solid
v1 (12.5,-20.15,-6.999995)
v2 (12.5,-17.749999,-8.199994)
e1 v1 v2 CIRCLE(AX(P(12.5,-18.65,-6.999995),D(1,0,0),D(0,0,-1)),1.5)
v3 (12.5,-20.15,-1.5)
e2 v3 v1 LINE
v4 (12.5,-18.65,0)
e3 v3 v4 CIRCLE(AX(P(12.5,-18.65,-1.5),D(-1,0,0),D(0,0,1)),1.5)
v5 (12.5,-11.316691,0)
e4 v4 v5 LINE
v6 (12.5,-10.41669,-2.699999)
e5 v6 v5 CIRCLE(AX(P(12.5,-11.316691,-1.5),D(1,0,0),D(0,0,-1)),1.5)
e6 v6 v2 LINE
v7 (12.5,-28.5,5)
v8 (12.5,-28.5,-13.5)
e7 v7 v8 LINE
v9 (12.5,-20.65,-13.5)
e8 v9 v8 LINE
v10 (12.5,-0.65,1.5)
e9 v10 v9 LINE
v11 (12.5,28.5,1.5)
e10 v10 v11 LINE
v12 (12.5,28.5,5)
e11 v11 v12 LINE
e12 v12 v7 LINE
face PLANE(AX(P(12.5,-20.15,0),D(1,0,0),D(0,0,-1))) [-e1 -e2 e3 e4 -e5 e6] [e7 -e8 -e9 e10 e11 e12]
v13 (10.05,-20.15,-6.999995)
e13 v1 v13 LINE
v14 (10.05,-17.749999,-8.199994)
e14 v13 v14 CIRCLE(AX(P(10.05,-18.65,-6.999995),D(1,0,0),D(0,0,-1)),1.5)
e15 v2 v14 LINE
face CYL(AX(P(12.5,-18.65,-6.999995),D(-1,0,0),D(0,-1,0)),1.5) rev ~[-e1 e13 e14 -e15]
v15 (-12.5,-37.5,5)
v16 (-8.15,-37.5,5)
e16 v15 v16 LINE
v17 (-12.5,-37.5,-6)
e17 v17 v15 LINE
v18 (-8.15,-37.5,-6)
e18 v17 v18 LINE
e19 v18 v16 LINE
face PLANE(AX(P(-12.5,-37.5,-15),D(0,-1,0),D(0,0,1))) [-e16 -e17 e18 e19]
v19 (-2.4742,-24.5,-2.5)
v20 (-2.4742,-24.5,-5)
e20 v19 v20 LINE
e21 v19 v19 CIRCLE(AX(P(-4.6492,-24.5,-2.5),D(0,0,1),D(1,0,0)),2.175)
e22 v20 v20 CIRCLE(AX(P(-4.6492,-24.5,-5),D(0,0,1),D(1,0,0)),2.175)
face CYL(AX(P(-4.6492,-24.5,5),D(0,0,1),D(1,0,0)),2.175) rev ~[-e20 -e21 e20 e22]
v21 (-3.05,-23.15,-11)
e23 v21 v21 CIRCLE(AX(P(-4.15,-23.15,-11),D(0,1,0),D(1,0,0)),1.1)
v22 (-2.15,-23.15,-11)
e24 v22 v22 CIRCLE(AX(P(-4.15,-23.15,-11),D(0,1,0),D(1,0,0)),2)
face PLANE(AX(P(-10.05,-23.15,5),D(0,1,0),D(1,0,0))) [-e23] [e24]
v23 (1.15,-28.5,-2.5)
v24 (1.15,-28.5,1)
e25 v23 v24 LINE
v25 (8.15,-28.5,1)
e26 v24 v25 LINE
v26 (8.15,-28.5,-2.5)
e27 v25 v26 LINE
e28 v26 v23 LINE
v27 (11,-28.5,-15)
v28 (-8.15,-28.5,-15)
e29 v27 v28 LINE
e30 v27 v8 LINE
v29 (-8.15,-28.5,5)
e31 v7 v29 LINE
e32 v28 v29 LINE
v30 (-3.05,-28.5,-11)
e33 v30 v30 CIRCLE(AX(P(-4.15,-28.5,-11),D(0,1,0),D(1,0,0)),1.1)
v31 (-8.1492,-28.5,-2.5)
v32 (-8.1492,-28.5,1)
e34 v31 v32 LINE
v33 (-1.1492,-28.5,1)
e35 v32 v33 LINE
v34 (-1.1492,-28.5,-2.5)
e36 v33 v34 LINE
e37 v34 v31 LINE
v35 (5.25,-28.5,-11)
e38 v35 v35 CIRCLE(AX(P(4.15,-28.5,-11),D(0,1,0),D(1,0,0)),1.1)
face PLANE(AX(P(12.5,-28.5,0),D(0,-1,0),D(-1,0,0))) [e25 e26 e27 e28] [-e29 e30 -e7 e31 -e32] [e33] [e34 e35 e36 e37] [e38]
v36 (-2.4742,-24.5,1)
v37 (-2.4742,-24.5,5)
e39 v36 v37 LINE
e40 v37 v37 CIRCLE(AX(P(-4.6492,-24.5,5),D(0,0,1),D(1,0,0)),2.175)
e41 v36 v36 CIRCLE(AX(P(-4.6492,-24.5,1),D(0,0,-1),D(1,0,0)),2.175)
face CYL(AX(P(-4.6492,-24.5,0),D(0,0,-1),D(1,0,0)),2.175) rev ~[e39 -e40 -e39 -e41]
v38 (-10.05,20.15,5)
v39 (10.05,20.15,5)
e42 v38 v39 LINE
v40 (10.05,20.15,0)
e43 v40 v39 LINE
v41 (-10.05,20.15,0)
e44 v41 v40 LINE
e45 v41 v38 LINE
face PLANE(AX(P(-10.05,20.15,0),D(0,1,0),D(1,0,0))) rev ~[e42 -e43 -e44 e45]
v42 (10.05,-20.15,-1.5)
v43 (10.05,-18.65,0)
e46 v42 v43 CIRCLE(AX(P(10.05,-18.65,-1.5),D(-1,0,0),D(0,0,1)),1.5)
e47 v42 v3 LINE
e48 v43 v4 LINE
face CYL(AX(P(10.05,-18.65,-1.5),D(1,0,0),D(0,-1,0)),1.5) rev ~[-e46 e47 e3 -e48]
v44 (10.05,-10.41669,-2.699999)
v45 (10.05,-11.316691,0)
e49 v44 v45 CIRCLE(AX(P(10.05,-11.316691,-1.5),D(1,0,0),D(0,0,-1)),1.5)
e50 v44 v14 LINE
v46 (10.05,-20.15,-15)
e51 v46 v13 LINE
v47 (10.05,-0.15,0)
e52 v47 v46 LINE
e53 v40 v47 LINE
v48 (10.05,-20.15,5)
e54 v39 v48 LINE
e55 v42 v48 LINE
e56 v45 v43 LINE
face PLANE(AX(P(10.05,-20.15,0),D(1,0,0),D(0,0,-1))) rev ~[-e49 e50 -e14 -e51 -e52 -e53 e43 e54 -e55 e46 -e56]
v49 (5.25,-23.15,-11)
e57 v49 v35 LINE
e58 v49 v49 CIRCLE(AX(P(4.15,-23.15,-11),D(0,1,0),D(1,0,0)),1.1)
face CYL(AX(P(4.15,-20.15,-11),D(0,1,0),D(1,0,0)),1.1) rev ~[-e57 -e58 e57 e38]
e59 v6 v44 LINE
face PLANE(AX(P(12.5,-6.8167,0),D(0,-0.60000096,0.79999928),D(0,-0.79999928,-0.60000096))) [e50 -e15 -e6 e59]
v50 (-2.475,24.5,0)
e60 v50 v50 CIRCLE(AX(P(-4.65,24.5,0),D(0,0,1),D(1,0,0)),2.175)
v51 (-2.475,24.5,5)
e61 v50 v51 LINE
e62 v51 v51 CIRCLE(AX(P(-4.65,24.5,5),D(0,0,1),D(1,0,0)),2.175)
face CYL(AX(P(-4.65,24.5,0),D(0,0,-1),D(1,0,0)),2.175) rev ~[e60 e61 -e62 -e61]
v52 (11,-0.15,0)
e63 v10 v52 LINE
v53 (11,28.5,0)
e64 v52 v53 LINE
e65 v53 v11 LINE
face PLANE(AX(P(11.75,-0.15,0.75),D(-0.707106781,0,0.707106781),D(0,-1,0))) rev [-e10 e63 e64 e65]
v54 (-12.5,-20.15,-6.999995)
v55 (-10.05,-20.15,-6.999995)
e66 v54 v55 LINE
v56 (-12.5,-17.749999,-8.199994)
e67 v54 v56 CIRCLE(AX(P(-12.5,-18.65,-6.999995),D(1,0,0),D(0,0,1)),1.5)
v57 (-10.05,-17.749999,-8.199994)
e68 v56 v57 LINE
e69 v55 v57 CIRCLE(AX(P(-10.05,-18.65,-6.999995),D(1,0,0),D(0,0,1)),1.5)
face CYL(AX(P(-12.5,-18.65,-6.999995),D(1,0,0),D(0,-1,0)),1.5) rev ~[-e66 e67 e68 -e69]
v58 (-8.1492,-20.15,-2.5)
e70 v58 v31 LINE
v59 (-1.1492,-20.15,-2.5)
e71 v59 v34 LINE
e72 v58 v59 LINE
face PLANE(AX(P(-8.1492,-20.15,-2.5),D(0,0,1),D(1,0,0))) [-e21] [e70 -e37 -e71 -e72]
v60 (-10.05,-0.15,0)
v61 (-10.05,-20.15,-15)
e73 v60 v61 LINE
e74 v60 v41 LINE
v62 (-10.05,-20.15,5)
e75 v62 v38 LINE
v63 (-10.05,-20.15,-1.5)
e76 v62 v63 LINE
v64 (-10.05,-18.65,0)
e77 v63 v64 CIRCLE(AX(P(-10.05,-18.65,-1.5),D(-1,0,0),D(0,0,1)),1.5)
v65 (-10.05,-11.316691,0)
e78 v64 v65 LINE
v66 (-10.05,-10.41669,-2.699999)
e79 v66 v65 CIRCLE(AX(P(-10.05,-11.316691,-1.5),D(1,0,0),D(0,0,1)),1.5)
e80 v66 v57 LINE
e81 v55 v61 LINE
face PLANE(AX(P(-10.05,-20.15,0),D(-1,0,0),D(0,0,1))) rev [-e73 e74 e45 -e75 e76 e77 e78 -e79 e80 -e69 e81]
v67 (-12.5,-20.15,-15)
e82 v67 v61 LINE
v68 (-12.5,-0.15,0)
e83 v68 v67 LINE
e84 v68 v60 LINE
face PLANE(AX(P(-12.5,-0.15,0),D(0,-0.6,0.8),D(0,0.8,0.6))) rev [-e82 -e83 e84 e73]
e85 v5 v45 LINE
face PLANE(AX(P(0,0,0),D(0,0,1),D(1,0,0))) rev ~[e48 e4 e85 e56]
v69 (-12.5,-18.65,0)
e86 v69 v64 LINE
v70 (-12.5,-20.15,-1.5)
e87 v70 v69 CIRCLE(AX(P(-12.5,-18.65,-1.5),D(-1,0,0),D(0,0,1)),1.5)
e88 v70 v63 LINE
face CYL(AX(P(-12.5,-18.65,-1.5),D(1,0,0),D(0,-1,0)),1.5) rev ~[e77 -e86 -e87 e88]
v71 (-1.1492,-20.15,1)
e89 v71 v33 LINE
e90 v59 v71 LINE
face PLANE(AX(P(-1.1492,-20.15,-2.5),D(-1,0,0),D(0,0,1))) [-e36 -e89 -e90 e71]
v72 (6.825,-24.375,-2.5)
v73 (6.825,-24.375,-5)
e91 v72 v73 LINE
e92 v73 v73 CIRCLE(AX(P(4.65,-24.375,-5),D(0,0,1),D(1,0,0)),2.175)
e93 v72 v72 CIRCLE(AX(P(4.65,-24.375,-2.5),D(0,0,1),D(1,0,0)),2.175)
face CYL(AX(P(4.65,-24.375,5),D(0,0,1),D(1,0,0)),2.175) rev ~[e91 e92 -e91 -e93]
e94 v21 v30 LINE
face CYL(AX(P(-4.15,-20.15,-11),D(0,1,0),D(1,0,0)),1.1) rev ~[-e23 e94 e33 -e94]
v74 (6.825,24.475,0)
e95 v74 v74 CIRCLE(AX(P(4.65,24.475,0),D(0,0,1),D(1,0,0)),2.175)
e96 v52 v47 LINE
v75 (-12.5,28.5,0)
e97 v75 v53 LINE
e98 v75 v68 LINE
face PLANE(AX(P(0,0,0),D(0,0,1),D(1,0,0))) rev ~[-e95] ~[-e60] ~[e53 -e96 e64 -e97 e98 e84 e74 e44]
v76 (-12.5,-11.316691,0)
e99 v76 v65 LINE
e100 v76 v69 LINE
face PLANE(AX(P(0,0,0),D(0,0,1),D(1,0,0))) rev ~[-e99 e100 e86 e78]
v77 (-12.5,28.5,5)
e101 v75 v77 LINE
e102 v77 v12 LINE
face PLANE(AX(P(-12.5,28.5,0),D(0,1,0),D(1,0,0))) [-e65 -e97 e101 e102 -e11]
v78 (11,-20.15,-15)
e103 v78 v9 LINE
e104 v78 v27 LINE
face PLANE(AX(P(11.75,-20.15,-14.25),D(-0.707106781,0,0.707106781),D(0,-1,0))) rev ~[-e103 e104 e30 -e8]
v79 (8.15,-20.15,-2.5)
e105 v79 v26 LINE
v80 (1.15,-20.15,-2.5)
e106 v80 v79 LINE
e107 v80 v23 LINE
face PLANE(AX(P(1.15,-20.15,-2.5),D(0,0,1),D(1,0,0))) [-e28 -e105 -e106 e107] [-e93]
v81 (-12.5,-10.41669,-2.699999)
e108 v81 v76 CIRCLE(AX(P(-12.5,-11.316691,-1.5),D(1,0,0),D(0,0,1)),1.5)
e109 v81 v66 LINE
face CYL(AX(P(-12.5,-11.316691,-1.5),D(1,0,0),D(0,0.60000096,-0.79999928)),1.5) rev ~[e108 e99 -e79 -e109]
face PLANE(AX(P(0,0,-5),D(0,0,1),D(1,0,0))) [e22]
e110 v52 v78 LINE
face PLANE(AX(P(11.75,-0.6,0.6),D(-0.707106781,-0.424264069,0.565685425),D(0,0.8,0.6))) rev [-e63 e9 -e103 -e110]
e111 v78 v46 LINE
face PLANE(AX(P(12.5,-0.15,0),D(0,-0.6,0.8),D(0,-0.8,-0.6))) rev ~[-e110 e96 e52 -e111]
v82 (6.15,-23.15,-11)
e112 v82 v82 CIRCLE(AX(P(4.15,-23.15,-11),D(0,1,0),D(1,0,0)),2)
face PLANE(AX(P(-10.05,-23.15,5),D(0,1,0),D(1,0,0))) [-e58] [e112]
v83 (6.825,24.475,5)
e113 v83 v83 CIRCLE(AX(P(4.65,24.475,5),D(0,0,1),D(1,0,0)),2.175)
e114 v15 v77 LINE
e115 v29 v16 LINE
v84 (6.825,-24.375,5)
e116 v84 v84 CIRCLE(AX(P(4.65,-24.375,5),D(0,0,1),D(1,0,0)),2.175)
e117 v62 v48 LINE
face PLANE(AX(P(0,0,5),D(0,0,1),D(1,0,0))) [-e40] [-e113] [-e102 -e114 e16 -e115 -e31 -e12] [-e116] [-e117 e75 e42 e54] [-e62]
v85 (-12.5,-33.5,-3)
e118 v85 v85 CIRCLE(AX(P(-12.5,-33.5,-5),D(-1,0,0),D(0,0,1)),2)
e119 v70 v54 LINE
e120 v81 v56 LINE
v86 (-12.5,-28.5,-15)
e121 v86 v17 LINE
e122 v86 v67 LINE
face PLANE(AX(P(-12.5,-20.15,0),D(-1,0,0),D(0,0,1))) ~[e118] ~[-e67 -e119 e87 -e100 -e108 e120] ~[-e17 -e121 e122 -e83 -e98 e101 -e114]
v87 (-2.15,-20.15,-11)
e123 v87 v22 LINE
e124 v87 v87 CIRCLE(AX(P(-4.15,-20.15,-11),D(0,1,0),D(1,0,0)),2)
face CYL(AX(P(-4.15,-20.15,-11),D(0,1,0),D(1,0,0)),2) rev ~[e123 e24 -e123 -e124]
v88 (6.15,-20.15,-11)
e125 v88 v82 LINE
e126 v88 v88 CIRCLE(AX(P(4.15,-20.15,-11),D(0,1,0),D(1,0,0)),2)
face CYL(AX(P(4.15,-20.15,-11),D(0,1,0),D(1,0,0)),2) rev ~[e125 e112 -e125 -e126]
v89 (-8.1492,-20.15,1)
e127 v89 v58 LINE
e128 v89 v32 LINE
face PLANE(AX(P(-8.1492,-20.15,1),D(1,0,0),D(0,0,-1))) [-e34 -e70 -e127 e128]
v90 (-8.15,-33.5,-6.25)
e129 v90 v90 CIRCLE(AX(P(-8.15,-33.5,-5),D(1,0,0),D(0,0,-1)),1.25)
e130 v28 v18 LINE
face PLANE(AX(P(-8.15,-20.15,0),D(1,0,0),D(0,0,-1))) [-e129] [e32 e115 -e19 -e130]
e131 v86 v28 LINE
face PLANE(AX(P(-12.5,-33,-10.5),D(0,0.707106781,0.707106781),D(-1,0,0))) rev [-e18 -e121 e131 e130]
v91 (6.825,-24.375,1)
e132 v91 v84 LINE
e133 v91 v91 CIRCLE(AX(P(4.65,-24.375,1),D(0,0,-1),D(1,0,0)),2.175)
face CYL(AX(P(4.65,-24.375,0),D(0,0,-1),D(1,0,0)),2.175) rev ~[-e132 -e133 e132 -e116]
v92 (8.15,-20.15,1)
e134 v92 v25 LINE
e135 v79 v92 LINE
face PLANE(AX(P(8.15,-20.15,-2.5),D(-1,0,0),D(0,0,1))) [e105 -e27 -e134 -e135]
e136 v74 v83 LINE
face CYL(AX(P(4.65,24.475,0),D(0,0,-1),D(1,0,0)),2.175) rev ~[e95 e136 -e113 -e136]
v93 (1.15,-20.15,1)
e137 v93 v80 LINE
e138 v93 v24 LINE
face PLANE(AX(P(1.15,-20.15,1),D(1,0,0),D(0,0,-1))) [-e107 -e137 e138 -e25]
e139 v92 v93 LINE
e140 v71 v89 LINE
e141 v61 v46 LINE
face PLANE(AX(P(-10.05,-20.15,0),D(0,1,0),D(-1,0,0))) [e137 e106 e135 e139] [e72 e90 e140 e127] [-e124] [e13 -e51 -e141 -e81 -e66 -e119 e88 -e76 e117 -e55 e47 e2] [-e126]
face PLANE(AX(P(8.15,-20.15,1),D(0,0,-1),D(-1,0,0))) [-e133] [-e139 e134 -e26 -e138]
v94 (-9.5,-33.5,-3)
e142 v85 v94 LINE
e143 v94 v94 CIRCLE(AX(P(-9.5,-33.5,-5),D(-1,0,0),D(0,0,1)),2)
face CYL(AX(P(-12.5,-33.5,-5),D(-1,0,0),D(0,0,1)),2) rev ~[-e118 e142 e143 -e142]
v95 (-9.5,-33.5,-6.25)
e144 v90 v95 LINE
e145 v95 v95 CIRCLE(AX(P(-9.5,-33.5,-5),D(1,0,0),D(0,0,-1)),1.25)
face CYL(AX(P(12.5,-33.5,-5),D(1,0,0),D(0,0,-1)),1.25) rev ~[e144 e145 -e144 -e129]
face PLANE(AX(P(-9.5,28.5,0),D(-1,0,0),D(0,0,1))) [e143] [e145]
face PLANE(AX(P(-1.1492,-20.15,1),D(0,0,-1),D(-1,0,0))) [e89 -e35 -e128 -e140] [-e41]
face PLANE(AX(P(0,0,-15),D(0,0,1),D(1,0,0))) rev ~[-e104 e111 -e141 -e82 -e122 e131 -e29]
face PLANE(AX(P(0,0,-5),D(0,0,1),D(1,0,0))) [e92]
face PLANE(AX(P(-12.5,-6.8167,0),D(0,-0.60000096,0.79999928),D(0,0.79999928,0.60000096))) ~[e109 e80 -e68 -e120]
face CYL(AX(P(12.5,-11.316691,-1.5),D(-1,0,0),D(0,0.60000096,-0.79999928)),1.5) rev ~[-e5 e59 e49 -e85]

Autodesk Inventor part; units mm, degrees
ref_plane "YZ Plane" through (0, 0, 0) normal (1, 0, 0) x (0, 1, 0)
ref_plane "XZ Plane" through (0, 0, 0) normal (0, 1, 0) x (-1, 0, 0)
sketch "Sketch1" plane through (0, 0, 0) normal (0, 0, 1) x (1, 0, 0)
  line L0 (-12.5, 28.5) -> (12.5, 28.5)
  line L1 (12.5, 28.5) -> (12.5, -28.5)
  line L2 (12.5, -28.5) -> (-12.5, -28.5)
  line L3 (-12.5, -28.5) -> (-12.5, 28.5)
  line L4 (-10.05, 20.15) -> (10.05, 20.15)
  line L5 (10.05, 20.15) -> (10.05, -20.15)
  line L6 (10.05, -20.15) -> (-10.05, -20.15)
  line L7 (-10.05, -20.15) -> (-10.05, 20.15)
  line L8 (0, 0) -> (0, 17.7516) construction
  line L9 (0, 0) -> (17.0454, 0) construction
  line L10 (-12.5, -28.5) -> (12.5, -28.5)
  line L11 (12.5, -28.5) -> (12.5, -20.15)
  line L12 (12.5, -20.15) -> (-12.5, -20.15)
  line L13 (-12.5, -20.15) -> (-12.5, -28.5)
  circle A0 centre (-4.65, 24.5) radius 2.175
  circle A1 centre (4.65, 24.475) radius 2.175
  circle A2 centre (-4.6492, -24.5) radius 2.175
  circle A3 centre (4.65, -24.375) radius 2.175
  point P0 (12.5, -24.325)
  dimension "d0" = 40.3
  dimension "d1" = 20.1
  dimension "d2" = 57
  dimension "d3" = 25
  dimension "d4" = 4.35
  dimension "d5" = 4.325
  dimension "d6" = 4.35
  dimension "d8" = 4.35
  dimension "d9" = 5.4
  dimension "d13" = 5.4
  dimension "d28" = 48.85
  dimension "d29" = 9.3
  dimension "d30" = 9.3
extrude "Extrusion1" add sketch "Sketch1" along normal blind 5 contours L0 L1 L12 L5 L4 L7 L3 | L12 L6 L1 L2 L3
extrude "Extrusion2" add sketch "Sketch1" against normal blind 15 contours L12 L6 L1 L2 L3 | A2 | A3
extrude "Extrusion3" cut sketch "Sketch1" against normal blind 10 from surface at 5 contours A2 | A3
sketch "Sketch2" plane through (-10.05, -20.15, 5) normal (0, 1, 0) x (1, 0, 0)
  circle A0 centre (5.9, 16) radius 1.1
  circle A1 centre (14.2, 16) radius 1.1
  line L0 (0, 0) -> (20.1, 0) construction
  line L1 (10.05, 0) -> (10.05, 23.167) construction
  line L2 (-2.45, 20) -> (22.55, 20) projected
  circle A2 centre (14.2, 16) radius 2
  circle A3 centre (5.9, 16) radius 2
  point P0 (10.05, 5)
  dimension "d20" = 2.2
  dimension "d21" = 8.3
  dimension "d22" = 4
  dimension "d23" = 4
extrude "Extrusion4" cut sketch "Sketch2" against normal blind 10 contours A0 | A1
extrude "Extrusion5" cut sketch "Sketch2" against normal blind 3 contours A0 | A1 | A2 | A3
sketch "Sketch3" plane through (12.5, -20.15, 0) normal (1, 0, 0) x (0, 0, -1)
  line L0 (0, 48.65) -> (-5, 48.65) construction
  line L1 (-5, 48.65) -> (38.6712, 48.65) construction
  line L2 (0, 0) -> (-5, 0) construction
  line L3 (-5, 0) -> (38.6712, 0) construction
  line L4 (0, 20) -> (15, 0)
  line L5 (0, 20) -> (0, 13.3333)
  line L6 (0, 13.3333) -> (10, 0)
  line L7 (10, 0) -> (15, 0)
  line L8 (15, 0) -> (15, -8.35) construction
  line L9 (15, -0.9137) -> (15, 2.4866) construction
  line L10 (-5, 0) -> (15, 0)
  line L11 (15, 0) -> (15, -17.35)
  line L12 (15, -17.35) -> (-5, -17.35)
  line L13 (-5, -17.35) -> (-5, 0)
  circle A0 centre (5, -13.35) radius 1.25
  line L14 (0, 0) -> (0, 48.65) projected
  line L15 (0, 48.65) -> (0, 0) projected
  line L16 (0, 0) -> (15, 0) projected
  line L17 (15, -8.35) -> (15, 0) projected
  line L18 (15, -8.35) -> (-5, -8.35) projected
  line L19 (-5, 48.65) -> (-5, -8.35) projected
  line L20 (0, 48.65) -> (-5, 48.65) projected
  point P0 (0, 20.15)
  dimension "d31" = 4
  dimension "d39" = 2.5
  dimension "d41" = 10
  dimension "d46" = 5
  dimension "d59" = 9
  dimension "d63" = 20
extrude "Extrusion6" add sketch "Sketch3" against normal up to surface (2.45 mm away) contours L4 L7 L6 L5
extrude "Extrusion7" add sketch "Sketch3" along normal blind 4.35 from surface at -25 contours L11 L18 L13 L10 L7 | L11 L12 L13 L18 | A0
extrude "Extrusion8" cut sketch "Sketch3" against normal blind 35.65 contours A0
ref_plane "Work Plane2" through (0, -28.5, 5) normal (1, 0, 0) x (0, 0, -1)
mirror "Mirror1" about plane through (0, -28.5, 5) normal (1, 0, 0) of "Extrusion6"
fillet "Fillet1" radius 1.5 6 edges at (11.275, -20.15, 0) (11.275, -6.8167, 0) (11.275, -20.15, -10) (-11.275, -20.15, -10) (-11.275, -6.8167, 0) (-11.275, -20.15, 0)
chamfer "Chamfer1" distance 1.5 angle 45 3 edges at (12.5, -24.325, -15) (12.5, -10.15, -7.5) (12.5, 14.175, 0)
sketch "Sketch4" plane through (-12.5, 28.5, 0) normal (-1, 0, 0) x (0, 0, 1)
  circle A0 centre (-5, -62) radius 1.25 projected
  circle A1 centre (-5, -62) radius 2
  point P0 (0, -28.5)
  dimension "d51" = 4
extrude "Extrusion9" cut sketch "Sketch4" against normal blind 3
sketch "Sketch5" plane through (-10.05, -20.15, 5) normal (0, 1, 0) x (1, 0, 0)
  line L0 (1.9008, 7.5) -> (8.9008, 7.5)
  line L1 (8.9008, 7.5) -> (8.9008, 4)
  line L2 (8.9008, 4) -> (1.9008, 4)
  line L3 (1.9008, 4) -> (1.9008, 7.5)
  line L4 (11.2, 7.5) -> (18.2, 7.5)
  line L5 (18.2, 7.5) -> (18.2, 4)
  line L6 (18.2, 4) -> (11.2, 4)
  line L7 (11.2, 4) -> (11.2, 7.5)
  line L8 (22.55, 0) -> (-2.45, 0) projected
  line L9 (5.4008, 4) -> (5.4008, 0) construction
  line L10 (14.7, 4) -> (14.7, 0) construction
  line L11 (7.5758, 0) -> (3.2258, 0) construction
  line L12 (16.875, 0) -> (12.525, 0) construction
  dimension "d54" = 7
  dimension "d55" = 3.5
  dimension "d56" = 4
extrude "Extrusion10" cut sketch "Sketch5" against normal blind 10
chamfer "Chamfer2" distance 9 angle 45 1 edges at (-10.325, -37.5, -15)
equation "\"d8\" = d6"
equation "\"d13\" = d9"
properties part number "BIGServoHolder_3DPrint"
